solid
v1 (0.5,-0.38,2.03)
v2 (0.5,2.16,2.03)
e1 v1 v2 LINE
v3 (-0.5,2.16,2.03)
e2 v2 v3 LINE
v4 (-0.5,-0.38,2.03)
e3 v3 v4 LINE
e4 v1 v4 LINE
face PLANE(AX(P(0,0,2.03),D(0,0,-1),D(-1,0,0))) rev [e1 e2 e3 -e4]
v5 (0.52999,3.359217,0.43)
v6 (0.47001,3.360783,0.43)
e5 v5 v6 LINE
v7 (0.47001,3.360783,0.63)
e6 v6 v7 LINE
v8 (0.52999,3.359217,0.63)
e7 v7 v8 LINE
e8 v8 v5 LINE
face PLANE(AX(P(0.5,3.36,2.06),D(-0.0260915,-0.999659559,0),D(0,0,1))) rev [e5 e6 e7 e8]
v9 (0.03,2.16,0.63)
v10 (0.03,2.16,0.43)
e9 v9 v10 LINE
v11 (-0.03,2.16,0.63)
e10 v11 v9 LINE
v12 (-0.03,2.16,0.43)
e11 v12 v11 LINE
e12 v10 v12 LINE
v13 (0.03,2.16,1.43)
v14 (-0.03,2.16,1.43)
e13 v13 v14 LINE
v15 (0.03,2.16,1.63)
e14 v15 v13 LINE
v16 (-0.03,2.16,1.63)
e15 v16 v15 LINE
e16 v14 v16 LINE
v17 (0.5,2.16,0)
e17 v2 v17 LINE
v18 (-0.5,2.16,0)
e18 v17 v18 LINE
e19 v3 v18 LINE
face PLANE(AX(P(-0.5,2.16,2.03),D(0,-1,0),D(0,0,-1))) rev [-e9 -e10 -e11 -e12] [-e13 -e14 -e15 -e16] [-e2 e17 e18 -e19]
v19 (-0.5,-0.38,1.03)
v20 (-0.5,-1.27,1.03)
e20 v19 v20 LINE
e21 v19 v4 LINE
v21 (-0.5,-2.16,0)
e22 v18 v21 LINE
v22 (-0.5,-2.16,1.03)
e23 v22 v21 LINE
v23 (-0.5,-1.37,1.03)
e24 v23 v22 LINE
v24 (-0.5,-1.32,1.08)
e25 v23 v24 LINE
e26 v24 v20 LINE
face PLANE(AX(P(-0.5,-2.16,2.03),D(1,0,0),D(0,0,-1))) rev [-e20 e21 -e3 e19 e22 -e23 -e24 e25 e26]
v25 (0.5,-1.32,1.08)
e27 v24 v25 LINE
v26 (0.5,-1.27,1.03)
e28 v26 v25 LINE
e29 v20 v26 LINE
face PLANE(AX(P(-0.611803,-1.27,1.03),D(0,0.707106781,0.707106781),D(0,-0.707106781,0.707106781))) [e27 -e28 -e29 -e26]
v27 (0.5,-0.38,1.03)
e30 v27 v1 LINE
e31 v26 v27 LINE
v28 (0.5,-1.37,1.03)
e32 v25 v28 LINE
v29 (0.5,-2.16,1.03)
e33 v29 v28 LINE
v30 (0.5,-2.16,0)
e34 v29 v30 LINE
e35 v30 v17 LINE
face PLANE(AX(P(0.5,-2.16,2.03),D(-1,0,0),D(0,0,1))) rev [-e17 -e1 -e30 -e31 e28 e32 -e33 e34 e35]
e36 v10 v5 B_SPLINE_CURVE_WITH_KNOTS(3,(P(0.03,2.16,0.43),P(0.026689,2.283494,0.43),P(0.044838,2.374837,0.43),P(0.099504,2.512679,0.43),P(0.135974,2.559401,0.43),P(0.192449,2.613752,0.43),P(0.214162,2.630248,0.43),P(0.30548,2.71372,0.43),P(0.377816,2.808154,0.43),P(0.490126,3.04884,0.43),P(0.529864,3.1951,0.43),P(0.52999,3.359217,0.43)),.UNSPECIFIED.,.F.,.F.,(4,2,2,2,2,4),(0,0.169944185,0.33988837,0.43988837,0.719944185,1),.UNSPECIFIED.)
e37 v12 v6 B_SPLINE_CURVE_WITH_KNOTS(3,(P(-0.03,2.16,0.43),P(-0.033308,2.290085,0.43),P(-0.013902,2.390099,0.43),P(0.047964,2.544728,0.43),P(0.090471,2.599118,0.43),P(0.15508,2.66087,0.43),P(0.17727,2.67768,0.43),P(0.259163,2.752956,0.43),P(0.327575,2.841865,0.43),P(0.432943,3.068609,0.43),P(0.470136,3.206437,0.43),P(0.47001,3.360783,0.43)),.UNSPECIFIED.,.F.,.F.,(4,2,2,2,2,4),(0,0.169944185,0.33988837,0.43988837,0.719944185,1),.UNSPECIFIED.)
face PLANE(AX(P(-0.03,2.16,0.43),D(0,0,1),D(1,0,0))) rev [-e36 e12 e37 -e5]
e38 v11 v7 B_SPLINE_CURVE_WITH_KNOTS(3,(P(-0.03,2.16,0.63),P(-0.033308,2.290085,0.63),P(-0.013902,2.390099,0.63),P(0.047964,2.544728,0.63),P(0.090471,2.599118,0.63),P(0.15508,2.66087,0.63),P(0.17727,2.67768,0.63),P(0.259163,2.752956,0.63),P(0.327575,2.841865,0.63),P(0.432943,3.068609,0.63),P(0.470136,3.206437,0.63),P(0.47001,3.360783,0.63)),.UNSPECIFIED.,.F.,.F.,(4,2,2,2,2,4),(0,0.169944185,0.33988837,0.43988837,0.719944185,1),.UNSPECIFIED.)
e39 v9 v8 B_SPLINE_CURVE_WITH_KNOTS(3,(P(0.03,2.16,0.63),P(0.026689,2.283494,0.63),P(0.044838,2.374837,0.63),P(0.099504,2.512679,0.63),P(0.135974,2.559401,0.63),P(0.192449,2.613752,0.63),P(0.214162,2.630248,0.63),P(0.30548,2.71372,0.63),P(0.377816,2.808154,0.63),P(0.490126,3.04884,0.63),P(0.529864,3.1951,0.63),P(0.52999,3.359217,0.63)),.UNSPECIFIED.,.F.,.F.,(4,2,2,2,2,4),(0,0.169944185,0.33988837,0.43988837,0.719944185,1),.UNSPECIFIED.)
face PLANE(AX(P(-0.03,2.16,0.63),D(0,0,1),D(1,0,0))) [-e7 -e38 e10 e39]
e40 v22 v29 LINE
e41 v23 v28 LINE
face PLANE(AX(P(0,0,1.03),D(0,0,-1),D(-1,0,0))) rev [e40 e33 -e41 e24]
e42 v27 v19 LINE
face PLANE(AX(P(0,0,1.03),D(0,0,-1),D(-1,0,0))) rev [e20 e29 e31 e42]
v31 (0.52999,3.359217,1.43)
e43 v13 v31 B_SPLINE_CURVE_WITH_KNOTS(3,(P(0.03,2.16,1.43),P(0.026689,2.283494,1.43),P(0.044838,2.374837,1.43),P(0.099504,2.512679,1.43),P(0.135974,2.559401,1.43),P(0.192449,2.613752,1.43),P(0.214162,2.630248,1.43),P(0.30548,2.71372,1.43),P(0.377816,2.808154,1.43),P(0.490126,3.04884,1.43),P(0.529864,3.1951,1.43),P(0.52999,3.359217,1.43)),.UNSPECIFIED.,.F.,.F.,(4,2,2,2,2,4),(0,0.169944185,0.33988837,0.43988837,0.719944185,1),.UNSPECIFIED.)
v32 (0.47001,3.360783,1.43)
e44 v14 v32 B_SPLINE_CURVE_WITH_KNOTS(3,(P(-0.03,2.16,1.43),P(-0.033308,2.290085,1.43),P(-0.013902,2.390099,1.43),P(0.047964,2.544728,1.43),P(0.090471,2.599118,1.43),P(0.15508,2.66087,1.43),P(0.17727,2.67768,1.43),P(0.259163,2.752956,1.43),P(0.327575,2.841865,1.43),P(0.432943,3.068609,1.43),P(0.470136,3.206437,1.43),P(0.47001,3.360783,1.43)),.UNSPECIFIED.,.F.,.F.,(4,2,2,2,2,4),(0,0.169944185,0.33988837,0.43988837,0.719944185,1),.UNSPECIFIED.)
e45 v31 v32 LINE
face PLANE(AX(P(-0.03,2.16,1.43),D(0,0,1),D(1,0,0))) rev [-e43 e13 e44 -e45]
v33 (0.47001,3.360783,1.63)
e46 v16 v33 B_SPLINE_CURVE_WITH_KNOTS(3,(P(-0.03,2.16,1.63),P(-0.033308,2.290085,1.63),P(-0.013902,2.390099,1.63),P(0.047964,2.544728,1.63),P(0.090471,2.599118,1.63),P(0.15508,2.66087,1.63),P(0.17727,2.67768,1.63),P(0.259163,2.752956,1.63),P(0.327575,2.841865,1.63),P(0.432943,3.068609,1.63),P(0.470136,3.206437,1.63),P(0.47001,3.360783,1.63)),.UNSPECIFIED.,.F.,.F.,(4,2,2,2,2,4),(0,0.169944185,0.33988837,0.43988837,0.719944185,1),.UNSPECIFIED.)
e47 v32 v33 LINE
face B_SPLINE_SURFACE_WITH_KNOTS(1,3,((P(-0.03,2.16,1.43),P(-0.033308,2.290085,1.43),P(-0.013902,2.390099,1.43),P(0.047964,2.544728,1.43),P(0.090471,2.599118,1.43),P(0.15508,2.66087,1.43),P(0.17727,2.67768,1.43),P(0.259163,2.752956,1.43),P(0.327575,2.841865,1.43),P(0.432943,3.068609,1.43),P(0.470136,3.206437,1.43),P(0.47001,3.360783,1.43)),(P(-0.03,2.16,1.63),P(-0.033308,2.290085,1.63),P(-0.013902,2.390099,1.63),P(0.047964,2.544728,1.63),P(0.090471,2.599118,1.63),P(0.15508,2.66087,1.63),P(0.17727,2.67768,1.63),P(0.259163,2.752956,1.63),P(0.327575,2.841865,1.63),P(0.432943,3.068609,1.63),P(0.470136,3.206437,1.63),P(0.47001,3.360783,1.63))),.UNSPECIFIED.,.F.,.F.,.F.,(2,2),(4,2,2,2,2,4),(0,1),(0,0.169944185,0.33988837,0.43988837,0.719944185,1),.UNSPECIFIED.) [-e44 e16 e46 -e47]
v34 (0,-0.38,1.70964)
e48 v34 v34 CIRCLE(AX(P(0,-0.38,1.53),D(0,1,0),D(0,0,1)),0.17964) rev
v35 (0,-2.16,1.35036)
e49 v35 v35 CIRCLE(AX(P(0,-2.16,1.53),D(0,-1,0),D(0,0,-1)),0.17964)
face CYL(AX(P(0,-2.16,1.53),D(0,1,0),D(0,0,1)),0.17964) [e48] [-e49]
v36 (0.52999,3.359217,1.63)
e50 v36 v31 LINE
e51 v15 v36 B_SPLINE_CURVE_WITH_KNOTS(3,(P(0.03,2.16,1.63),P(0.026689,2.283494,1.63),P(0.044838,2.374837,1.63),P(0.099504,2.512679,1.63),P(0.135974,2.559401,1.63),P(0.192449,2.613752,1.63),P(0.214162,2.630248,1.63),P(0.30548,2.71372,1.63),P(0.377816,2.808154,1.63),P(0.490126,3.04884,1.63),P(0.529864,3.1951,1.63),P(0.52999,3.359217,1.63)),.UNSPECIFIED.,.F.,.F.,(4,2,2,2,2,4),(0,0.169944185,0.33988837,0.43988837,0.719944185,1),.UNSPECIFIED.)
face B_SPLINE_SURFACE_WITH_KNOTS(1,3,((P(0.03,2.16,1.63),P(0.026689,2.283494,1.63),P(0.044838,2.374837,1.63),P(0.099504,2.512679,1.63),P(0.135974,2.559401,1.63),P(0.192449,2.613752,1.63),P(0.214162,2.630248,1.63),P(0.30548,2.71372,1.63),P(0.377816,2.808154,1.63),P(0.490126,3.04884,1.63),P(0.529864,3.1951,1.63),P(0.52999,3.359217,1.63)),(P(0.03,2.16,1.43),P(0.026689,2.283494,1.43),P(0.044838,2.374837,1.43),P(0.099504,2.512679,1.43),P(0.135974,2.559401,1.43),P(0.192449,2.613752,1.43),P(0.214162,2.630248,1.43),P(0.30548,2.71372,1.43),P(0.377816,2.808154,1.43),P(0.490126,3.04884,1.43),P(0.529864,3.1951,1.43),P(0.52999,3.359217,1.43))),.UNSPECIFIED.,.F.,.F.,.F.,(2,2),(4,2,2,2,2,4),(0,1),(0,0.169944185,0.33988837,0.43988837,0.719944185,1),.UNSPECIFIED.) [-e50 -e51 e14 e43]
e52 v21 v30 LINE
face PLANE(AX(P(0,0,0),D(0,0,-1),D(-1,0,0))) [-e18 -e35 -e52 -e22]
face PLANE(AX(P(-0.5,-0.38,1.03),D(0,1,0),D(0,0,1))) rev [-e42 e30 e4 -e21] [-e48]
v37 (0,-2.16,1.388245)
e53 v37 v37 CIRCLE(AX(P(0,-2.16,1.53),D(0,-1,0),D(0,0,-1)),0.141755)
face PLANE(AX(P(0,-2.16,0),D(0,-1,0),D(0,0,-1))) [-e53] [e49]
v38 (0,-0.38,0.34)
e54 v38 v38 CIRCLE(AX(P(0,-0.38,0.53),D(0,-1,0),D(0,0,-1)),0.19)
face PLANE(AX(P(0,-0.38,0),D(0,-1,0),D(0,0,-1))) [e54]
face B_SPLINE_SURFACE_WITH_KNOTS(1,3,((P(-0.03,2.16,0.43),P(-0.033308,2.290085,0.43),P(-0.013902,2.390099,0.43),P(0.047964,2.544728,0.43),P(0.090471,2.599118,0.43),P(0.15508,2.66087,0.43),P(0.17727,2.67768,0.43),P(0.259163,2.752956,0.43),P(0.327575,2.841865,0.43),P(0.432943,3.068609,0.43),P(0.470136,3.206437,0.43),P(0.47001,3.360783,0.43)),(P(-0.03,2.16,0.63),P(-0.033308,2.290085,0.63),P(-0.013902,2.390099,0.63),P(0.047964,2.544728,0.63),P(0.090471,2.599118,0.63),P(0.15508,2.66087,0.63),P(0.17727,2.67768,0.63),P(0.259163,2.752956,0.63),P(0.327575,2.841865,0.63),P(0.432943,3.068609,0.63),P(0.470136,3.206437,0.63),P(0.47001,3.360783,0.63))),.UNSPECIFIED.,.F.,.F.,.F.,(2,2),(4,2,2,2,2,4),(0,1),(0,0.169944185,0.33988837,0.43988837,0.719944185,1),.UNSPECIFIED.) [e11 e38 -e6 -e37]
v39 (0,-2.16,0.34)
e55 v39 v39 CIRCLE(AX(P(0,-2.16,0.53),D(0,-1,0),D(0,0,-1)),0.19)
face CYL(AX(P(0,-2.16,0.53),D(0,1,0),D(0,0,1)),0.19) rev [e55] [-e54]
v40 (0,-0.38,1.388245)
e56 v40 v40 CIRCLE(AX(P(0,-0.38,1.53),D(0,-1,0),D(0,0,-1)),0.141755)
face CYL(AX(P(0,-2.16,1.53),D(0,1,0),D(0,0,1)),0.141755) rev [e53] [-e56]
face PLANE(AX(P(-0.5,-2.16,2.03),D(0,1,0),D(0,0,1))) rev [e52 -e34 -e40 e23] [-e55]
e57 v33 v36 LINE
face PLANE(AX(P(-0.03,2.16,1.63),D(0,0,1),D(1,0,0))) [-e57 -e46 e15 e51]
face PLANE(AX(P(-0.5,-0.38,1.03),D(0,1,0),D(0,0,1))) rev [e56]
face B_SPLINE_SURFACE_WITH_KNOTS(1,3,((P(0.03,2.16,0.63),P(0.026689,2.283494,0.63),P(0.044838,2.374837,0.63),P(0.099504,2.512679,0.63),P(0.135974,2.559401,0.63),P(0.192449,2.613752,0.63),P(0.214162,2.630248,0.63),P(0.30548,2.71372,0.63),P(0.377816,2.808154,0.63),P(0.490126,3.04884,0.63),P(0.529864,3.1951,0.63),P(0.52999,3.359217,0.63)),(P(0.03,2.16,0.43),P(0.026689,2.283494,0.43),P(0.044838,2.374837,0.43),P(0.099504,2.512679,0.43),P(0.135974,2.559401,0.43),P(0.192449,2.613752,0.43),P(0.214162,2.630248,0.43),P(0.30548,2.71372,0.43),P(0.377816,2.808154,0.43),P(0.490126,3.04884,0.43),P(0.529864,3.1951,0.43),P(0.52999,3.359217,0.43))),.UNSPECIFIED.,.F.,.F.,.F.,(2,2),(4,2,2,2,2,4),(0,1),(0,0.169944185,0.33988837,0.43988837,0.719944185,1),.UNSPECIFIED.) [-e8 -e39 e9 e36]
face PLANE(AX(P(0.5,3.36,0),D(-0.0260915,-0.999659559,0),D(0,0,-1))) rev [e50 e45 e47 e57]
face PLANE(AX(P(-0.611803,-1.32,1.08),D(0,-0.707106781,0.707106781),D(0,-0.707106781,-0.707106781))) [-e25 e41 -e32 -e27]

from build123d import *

# Parameters (mm, degrees)
SKETCH1_W           = 1
SKETCH1_H           = 4.32
BOSS_EXTRUDE1_DEPTH = 2.03
SKETCH2_W           = 1
SKETCH2_H           = 1.78
CUT_EXTRUDE1_DEPTH  = 1
SKETCH3_R           = 0.179640036
SKETCH3_R_2         = 0.141754664
BOSS_EXTRUDE2_DEPTH = 1.78
SKETCH3_3_R         = 0.19
CUT_EXTRUDE2_DEPTH  = 4.28975683
SKETCH7_W           = 0.06
SKETCH7_H           = 0.2
MIRROR1_START       = 0.43
MIRROR1_DEPTH       = 0.2
BOSS_EXTRUDE3_DEPTH = 1


with BuildPart() as part:
    # Sketch1 → Boss-Extrude1 (new body)
    with BuildSketch(Plane.XY):
        Rectangle(SKETCH1_W, SKETCH1_H)
    extrude(amount=BOSS_EXTRUDE1_DEPTH)

    # Sketch2 → Cut-Extrude1 (cut)
    with BuildSketch(Plane.XY.offset(2.03)):
        with Locations((0, -1.27)):
            Rectangle(SKETCH2_W, SKETCH2_H)
    extrude(amount=-CUT_EXTRUDE1_DEPTH, mode=Mode.SUBTRACT)

    # Sketch3 → Boss-Extrude2 (add)
    with BuildSketch(Plane.XZ.offset(0.38)):
        with Locations(Location((0, 1.53, 0), (0, 0, 90))):
            Circle(SKETCH3_R)
        with Locations(Location((0, 1.53, 0), (0, 0, 270))):
            Circle(SKETCH3_R_2, mode=Mode.SUBTRACT)
    extrude(amount=BOSS_EXTRUDE2_DEPTH)

    # Sketch3<3> → Cut-Extrude2 (cut, through all)
    with BuildSketch(Plane.XZ.offset(0.38)):
        with Locations(Location((0, 0.53, 0), (0, 0, 270))):
            Circle(SKETCH3_3_R)
    extrude(amount=CUT_EXTRUDE2_DEPTH, mode=Mode.SUBTRACT)

    # Sweep2: sweep along a path in Sketch6
    with BuildLine() as sweep2_path:  # in the path sketch's own coordinates; laid on its plane below (add() does not lay a ready-made edge on the line's plane)
        add(Edge.make_bspline(
            [(0, 2.16), (0.006618512, 2.413579092), (-0.099153844, 2.580707218), (-0.318669183, 2.747242888), (-0.5, 3.04153675), (-0.5, 3.36)],
            knots=[0, 0, 0, 0, 0.33988837, 0.43988837, 1, 1, 1, 1], degree=3))
    # Sketch7 → Sweep2 (sweep)
    with BuildSketch(Plane(origin=(0, 2.16, 0), x_dir=(1, 0, 0), z_dir=(0, 1, 0))):
        with Locations((0, -1.53)):
            Rectangle(SKETCH7_W, SKETCH7_H)
    sweep(path=Plane(origin=(0, 0, 1.53), x_dir=(-1, 0, 0), z_dir=(0, 0, -1)) * sweep2_path.line)

    # Mirror1: read off the stored shape, not the designer's step
    # Mirror1 outline → Mirror1 (add)
    with BuildSketch(Plane.XY.offset(MIRROR1_START)):
        with BuildLine():
            Line((-0.03, 2.16), (0.03, 2.16))
            add(Edge.make_bspline(
                [(0.03, 2.16), (0.026689237, 2.283494275), (0.044838373, 2.374836995), (0.09950353, 2.512679036), (0.135974255, 2.559401221), (0.192448919, 2.613751579), (0.214161718, 2.63024792), (0.305479678, 2.713719563), (0.377816112, 2.80815353), (0.490125853, 3.048840143), (0.529863619, 3.195099656), (0.529989787, 3.359217255)],
                knots=[0, 0, 0, 0, 0.169944185, 0.169944185, 0.33988837, 0.33988837, 0.43988837, 0.43988837, 0.719944185, 0.719944185, 1, 1, 1, 1], degree=3))
            Line((0.529989787, 3.359217255), (0.470010213, 3.360782745))
            add(Edge.make_bspline(
                [(-0.03, 2.16), (-0.033307725, 2.290084846), (-0.013902459, 2.390098952), (0.047964171, 2.544727536), (0.090471438, 2.599118005), (0.15508015, 2.660870348), (0.177270449, 2.677680388), (0.259162827, 2.752955531), (0.327574678, 2.841864618), (0.432943498, 3.068609235), (0.470136161, 3.2064371), (0.470010213, 3.360782745)],
                knots=[0, 0, 0, 0, 0.169944185, 0.169944185, 0.33988837, 0.33988837, 0.43988837, 0.43988837, 0.719944185, 0.719944185, 1, 1, 1, 1], degree=3))
        make_face()
    extrude(amount=MIRROR1_DEPTH)

    # Sketch8 → Boss-Extrude3 (add)
    with BuildSketch(Plane(origin=(0.5, 0, 0), x_dir=(0, 0, -1), z_dir=(1, 0, 0))):
        Polygon((-1.03, -1.27), (-1.08, -1.32), (-1.03, -1.37), align=None)
    extrude(amount=-BOSS_EXTRUDE3_DEPTH)


solid = part.part
